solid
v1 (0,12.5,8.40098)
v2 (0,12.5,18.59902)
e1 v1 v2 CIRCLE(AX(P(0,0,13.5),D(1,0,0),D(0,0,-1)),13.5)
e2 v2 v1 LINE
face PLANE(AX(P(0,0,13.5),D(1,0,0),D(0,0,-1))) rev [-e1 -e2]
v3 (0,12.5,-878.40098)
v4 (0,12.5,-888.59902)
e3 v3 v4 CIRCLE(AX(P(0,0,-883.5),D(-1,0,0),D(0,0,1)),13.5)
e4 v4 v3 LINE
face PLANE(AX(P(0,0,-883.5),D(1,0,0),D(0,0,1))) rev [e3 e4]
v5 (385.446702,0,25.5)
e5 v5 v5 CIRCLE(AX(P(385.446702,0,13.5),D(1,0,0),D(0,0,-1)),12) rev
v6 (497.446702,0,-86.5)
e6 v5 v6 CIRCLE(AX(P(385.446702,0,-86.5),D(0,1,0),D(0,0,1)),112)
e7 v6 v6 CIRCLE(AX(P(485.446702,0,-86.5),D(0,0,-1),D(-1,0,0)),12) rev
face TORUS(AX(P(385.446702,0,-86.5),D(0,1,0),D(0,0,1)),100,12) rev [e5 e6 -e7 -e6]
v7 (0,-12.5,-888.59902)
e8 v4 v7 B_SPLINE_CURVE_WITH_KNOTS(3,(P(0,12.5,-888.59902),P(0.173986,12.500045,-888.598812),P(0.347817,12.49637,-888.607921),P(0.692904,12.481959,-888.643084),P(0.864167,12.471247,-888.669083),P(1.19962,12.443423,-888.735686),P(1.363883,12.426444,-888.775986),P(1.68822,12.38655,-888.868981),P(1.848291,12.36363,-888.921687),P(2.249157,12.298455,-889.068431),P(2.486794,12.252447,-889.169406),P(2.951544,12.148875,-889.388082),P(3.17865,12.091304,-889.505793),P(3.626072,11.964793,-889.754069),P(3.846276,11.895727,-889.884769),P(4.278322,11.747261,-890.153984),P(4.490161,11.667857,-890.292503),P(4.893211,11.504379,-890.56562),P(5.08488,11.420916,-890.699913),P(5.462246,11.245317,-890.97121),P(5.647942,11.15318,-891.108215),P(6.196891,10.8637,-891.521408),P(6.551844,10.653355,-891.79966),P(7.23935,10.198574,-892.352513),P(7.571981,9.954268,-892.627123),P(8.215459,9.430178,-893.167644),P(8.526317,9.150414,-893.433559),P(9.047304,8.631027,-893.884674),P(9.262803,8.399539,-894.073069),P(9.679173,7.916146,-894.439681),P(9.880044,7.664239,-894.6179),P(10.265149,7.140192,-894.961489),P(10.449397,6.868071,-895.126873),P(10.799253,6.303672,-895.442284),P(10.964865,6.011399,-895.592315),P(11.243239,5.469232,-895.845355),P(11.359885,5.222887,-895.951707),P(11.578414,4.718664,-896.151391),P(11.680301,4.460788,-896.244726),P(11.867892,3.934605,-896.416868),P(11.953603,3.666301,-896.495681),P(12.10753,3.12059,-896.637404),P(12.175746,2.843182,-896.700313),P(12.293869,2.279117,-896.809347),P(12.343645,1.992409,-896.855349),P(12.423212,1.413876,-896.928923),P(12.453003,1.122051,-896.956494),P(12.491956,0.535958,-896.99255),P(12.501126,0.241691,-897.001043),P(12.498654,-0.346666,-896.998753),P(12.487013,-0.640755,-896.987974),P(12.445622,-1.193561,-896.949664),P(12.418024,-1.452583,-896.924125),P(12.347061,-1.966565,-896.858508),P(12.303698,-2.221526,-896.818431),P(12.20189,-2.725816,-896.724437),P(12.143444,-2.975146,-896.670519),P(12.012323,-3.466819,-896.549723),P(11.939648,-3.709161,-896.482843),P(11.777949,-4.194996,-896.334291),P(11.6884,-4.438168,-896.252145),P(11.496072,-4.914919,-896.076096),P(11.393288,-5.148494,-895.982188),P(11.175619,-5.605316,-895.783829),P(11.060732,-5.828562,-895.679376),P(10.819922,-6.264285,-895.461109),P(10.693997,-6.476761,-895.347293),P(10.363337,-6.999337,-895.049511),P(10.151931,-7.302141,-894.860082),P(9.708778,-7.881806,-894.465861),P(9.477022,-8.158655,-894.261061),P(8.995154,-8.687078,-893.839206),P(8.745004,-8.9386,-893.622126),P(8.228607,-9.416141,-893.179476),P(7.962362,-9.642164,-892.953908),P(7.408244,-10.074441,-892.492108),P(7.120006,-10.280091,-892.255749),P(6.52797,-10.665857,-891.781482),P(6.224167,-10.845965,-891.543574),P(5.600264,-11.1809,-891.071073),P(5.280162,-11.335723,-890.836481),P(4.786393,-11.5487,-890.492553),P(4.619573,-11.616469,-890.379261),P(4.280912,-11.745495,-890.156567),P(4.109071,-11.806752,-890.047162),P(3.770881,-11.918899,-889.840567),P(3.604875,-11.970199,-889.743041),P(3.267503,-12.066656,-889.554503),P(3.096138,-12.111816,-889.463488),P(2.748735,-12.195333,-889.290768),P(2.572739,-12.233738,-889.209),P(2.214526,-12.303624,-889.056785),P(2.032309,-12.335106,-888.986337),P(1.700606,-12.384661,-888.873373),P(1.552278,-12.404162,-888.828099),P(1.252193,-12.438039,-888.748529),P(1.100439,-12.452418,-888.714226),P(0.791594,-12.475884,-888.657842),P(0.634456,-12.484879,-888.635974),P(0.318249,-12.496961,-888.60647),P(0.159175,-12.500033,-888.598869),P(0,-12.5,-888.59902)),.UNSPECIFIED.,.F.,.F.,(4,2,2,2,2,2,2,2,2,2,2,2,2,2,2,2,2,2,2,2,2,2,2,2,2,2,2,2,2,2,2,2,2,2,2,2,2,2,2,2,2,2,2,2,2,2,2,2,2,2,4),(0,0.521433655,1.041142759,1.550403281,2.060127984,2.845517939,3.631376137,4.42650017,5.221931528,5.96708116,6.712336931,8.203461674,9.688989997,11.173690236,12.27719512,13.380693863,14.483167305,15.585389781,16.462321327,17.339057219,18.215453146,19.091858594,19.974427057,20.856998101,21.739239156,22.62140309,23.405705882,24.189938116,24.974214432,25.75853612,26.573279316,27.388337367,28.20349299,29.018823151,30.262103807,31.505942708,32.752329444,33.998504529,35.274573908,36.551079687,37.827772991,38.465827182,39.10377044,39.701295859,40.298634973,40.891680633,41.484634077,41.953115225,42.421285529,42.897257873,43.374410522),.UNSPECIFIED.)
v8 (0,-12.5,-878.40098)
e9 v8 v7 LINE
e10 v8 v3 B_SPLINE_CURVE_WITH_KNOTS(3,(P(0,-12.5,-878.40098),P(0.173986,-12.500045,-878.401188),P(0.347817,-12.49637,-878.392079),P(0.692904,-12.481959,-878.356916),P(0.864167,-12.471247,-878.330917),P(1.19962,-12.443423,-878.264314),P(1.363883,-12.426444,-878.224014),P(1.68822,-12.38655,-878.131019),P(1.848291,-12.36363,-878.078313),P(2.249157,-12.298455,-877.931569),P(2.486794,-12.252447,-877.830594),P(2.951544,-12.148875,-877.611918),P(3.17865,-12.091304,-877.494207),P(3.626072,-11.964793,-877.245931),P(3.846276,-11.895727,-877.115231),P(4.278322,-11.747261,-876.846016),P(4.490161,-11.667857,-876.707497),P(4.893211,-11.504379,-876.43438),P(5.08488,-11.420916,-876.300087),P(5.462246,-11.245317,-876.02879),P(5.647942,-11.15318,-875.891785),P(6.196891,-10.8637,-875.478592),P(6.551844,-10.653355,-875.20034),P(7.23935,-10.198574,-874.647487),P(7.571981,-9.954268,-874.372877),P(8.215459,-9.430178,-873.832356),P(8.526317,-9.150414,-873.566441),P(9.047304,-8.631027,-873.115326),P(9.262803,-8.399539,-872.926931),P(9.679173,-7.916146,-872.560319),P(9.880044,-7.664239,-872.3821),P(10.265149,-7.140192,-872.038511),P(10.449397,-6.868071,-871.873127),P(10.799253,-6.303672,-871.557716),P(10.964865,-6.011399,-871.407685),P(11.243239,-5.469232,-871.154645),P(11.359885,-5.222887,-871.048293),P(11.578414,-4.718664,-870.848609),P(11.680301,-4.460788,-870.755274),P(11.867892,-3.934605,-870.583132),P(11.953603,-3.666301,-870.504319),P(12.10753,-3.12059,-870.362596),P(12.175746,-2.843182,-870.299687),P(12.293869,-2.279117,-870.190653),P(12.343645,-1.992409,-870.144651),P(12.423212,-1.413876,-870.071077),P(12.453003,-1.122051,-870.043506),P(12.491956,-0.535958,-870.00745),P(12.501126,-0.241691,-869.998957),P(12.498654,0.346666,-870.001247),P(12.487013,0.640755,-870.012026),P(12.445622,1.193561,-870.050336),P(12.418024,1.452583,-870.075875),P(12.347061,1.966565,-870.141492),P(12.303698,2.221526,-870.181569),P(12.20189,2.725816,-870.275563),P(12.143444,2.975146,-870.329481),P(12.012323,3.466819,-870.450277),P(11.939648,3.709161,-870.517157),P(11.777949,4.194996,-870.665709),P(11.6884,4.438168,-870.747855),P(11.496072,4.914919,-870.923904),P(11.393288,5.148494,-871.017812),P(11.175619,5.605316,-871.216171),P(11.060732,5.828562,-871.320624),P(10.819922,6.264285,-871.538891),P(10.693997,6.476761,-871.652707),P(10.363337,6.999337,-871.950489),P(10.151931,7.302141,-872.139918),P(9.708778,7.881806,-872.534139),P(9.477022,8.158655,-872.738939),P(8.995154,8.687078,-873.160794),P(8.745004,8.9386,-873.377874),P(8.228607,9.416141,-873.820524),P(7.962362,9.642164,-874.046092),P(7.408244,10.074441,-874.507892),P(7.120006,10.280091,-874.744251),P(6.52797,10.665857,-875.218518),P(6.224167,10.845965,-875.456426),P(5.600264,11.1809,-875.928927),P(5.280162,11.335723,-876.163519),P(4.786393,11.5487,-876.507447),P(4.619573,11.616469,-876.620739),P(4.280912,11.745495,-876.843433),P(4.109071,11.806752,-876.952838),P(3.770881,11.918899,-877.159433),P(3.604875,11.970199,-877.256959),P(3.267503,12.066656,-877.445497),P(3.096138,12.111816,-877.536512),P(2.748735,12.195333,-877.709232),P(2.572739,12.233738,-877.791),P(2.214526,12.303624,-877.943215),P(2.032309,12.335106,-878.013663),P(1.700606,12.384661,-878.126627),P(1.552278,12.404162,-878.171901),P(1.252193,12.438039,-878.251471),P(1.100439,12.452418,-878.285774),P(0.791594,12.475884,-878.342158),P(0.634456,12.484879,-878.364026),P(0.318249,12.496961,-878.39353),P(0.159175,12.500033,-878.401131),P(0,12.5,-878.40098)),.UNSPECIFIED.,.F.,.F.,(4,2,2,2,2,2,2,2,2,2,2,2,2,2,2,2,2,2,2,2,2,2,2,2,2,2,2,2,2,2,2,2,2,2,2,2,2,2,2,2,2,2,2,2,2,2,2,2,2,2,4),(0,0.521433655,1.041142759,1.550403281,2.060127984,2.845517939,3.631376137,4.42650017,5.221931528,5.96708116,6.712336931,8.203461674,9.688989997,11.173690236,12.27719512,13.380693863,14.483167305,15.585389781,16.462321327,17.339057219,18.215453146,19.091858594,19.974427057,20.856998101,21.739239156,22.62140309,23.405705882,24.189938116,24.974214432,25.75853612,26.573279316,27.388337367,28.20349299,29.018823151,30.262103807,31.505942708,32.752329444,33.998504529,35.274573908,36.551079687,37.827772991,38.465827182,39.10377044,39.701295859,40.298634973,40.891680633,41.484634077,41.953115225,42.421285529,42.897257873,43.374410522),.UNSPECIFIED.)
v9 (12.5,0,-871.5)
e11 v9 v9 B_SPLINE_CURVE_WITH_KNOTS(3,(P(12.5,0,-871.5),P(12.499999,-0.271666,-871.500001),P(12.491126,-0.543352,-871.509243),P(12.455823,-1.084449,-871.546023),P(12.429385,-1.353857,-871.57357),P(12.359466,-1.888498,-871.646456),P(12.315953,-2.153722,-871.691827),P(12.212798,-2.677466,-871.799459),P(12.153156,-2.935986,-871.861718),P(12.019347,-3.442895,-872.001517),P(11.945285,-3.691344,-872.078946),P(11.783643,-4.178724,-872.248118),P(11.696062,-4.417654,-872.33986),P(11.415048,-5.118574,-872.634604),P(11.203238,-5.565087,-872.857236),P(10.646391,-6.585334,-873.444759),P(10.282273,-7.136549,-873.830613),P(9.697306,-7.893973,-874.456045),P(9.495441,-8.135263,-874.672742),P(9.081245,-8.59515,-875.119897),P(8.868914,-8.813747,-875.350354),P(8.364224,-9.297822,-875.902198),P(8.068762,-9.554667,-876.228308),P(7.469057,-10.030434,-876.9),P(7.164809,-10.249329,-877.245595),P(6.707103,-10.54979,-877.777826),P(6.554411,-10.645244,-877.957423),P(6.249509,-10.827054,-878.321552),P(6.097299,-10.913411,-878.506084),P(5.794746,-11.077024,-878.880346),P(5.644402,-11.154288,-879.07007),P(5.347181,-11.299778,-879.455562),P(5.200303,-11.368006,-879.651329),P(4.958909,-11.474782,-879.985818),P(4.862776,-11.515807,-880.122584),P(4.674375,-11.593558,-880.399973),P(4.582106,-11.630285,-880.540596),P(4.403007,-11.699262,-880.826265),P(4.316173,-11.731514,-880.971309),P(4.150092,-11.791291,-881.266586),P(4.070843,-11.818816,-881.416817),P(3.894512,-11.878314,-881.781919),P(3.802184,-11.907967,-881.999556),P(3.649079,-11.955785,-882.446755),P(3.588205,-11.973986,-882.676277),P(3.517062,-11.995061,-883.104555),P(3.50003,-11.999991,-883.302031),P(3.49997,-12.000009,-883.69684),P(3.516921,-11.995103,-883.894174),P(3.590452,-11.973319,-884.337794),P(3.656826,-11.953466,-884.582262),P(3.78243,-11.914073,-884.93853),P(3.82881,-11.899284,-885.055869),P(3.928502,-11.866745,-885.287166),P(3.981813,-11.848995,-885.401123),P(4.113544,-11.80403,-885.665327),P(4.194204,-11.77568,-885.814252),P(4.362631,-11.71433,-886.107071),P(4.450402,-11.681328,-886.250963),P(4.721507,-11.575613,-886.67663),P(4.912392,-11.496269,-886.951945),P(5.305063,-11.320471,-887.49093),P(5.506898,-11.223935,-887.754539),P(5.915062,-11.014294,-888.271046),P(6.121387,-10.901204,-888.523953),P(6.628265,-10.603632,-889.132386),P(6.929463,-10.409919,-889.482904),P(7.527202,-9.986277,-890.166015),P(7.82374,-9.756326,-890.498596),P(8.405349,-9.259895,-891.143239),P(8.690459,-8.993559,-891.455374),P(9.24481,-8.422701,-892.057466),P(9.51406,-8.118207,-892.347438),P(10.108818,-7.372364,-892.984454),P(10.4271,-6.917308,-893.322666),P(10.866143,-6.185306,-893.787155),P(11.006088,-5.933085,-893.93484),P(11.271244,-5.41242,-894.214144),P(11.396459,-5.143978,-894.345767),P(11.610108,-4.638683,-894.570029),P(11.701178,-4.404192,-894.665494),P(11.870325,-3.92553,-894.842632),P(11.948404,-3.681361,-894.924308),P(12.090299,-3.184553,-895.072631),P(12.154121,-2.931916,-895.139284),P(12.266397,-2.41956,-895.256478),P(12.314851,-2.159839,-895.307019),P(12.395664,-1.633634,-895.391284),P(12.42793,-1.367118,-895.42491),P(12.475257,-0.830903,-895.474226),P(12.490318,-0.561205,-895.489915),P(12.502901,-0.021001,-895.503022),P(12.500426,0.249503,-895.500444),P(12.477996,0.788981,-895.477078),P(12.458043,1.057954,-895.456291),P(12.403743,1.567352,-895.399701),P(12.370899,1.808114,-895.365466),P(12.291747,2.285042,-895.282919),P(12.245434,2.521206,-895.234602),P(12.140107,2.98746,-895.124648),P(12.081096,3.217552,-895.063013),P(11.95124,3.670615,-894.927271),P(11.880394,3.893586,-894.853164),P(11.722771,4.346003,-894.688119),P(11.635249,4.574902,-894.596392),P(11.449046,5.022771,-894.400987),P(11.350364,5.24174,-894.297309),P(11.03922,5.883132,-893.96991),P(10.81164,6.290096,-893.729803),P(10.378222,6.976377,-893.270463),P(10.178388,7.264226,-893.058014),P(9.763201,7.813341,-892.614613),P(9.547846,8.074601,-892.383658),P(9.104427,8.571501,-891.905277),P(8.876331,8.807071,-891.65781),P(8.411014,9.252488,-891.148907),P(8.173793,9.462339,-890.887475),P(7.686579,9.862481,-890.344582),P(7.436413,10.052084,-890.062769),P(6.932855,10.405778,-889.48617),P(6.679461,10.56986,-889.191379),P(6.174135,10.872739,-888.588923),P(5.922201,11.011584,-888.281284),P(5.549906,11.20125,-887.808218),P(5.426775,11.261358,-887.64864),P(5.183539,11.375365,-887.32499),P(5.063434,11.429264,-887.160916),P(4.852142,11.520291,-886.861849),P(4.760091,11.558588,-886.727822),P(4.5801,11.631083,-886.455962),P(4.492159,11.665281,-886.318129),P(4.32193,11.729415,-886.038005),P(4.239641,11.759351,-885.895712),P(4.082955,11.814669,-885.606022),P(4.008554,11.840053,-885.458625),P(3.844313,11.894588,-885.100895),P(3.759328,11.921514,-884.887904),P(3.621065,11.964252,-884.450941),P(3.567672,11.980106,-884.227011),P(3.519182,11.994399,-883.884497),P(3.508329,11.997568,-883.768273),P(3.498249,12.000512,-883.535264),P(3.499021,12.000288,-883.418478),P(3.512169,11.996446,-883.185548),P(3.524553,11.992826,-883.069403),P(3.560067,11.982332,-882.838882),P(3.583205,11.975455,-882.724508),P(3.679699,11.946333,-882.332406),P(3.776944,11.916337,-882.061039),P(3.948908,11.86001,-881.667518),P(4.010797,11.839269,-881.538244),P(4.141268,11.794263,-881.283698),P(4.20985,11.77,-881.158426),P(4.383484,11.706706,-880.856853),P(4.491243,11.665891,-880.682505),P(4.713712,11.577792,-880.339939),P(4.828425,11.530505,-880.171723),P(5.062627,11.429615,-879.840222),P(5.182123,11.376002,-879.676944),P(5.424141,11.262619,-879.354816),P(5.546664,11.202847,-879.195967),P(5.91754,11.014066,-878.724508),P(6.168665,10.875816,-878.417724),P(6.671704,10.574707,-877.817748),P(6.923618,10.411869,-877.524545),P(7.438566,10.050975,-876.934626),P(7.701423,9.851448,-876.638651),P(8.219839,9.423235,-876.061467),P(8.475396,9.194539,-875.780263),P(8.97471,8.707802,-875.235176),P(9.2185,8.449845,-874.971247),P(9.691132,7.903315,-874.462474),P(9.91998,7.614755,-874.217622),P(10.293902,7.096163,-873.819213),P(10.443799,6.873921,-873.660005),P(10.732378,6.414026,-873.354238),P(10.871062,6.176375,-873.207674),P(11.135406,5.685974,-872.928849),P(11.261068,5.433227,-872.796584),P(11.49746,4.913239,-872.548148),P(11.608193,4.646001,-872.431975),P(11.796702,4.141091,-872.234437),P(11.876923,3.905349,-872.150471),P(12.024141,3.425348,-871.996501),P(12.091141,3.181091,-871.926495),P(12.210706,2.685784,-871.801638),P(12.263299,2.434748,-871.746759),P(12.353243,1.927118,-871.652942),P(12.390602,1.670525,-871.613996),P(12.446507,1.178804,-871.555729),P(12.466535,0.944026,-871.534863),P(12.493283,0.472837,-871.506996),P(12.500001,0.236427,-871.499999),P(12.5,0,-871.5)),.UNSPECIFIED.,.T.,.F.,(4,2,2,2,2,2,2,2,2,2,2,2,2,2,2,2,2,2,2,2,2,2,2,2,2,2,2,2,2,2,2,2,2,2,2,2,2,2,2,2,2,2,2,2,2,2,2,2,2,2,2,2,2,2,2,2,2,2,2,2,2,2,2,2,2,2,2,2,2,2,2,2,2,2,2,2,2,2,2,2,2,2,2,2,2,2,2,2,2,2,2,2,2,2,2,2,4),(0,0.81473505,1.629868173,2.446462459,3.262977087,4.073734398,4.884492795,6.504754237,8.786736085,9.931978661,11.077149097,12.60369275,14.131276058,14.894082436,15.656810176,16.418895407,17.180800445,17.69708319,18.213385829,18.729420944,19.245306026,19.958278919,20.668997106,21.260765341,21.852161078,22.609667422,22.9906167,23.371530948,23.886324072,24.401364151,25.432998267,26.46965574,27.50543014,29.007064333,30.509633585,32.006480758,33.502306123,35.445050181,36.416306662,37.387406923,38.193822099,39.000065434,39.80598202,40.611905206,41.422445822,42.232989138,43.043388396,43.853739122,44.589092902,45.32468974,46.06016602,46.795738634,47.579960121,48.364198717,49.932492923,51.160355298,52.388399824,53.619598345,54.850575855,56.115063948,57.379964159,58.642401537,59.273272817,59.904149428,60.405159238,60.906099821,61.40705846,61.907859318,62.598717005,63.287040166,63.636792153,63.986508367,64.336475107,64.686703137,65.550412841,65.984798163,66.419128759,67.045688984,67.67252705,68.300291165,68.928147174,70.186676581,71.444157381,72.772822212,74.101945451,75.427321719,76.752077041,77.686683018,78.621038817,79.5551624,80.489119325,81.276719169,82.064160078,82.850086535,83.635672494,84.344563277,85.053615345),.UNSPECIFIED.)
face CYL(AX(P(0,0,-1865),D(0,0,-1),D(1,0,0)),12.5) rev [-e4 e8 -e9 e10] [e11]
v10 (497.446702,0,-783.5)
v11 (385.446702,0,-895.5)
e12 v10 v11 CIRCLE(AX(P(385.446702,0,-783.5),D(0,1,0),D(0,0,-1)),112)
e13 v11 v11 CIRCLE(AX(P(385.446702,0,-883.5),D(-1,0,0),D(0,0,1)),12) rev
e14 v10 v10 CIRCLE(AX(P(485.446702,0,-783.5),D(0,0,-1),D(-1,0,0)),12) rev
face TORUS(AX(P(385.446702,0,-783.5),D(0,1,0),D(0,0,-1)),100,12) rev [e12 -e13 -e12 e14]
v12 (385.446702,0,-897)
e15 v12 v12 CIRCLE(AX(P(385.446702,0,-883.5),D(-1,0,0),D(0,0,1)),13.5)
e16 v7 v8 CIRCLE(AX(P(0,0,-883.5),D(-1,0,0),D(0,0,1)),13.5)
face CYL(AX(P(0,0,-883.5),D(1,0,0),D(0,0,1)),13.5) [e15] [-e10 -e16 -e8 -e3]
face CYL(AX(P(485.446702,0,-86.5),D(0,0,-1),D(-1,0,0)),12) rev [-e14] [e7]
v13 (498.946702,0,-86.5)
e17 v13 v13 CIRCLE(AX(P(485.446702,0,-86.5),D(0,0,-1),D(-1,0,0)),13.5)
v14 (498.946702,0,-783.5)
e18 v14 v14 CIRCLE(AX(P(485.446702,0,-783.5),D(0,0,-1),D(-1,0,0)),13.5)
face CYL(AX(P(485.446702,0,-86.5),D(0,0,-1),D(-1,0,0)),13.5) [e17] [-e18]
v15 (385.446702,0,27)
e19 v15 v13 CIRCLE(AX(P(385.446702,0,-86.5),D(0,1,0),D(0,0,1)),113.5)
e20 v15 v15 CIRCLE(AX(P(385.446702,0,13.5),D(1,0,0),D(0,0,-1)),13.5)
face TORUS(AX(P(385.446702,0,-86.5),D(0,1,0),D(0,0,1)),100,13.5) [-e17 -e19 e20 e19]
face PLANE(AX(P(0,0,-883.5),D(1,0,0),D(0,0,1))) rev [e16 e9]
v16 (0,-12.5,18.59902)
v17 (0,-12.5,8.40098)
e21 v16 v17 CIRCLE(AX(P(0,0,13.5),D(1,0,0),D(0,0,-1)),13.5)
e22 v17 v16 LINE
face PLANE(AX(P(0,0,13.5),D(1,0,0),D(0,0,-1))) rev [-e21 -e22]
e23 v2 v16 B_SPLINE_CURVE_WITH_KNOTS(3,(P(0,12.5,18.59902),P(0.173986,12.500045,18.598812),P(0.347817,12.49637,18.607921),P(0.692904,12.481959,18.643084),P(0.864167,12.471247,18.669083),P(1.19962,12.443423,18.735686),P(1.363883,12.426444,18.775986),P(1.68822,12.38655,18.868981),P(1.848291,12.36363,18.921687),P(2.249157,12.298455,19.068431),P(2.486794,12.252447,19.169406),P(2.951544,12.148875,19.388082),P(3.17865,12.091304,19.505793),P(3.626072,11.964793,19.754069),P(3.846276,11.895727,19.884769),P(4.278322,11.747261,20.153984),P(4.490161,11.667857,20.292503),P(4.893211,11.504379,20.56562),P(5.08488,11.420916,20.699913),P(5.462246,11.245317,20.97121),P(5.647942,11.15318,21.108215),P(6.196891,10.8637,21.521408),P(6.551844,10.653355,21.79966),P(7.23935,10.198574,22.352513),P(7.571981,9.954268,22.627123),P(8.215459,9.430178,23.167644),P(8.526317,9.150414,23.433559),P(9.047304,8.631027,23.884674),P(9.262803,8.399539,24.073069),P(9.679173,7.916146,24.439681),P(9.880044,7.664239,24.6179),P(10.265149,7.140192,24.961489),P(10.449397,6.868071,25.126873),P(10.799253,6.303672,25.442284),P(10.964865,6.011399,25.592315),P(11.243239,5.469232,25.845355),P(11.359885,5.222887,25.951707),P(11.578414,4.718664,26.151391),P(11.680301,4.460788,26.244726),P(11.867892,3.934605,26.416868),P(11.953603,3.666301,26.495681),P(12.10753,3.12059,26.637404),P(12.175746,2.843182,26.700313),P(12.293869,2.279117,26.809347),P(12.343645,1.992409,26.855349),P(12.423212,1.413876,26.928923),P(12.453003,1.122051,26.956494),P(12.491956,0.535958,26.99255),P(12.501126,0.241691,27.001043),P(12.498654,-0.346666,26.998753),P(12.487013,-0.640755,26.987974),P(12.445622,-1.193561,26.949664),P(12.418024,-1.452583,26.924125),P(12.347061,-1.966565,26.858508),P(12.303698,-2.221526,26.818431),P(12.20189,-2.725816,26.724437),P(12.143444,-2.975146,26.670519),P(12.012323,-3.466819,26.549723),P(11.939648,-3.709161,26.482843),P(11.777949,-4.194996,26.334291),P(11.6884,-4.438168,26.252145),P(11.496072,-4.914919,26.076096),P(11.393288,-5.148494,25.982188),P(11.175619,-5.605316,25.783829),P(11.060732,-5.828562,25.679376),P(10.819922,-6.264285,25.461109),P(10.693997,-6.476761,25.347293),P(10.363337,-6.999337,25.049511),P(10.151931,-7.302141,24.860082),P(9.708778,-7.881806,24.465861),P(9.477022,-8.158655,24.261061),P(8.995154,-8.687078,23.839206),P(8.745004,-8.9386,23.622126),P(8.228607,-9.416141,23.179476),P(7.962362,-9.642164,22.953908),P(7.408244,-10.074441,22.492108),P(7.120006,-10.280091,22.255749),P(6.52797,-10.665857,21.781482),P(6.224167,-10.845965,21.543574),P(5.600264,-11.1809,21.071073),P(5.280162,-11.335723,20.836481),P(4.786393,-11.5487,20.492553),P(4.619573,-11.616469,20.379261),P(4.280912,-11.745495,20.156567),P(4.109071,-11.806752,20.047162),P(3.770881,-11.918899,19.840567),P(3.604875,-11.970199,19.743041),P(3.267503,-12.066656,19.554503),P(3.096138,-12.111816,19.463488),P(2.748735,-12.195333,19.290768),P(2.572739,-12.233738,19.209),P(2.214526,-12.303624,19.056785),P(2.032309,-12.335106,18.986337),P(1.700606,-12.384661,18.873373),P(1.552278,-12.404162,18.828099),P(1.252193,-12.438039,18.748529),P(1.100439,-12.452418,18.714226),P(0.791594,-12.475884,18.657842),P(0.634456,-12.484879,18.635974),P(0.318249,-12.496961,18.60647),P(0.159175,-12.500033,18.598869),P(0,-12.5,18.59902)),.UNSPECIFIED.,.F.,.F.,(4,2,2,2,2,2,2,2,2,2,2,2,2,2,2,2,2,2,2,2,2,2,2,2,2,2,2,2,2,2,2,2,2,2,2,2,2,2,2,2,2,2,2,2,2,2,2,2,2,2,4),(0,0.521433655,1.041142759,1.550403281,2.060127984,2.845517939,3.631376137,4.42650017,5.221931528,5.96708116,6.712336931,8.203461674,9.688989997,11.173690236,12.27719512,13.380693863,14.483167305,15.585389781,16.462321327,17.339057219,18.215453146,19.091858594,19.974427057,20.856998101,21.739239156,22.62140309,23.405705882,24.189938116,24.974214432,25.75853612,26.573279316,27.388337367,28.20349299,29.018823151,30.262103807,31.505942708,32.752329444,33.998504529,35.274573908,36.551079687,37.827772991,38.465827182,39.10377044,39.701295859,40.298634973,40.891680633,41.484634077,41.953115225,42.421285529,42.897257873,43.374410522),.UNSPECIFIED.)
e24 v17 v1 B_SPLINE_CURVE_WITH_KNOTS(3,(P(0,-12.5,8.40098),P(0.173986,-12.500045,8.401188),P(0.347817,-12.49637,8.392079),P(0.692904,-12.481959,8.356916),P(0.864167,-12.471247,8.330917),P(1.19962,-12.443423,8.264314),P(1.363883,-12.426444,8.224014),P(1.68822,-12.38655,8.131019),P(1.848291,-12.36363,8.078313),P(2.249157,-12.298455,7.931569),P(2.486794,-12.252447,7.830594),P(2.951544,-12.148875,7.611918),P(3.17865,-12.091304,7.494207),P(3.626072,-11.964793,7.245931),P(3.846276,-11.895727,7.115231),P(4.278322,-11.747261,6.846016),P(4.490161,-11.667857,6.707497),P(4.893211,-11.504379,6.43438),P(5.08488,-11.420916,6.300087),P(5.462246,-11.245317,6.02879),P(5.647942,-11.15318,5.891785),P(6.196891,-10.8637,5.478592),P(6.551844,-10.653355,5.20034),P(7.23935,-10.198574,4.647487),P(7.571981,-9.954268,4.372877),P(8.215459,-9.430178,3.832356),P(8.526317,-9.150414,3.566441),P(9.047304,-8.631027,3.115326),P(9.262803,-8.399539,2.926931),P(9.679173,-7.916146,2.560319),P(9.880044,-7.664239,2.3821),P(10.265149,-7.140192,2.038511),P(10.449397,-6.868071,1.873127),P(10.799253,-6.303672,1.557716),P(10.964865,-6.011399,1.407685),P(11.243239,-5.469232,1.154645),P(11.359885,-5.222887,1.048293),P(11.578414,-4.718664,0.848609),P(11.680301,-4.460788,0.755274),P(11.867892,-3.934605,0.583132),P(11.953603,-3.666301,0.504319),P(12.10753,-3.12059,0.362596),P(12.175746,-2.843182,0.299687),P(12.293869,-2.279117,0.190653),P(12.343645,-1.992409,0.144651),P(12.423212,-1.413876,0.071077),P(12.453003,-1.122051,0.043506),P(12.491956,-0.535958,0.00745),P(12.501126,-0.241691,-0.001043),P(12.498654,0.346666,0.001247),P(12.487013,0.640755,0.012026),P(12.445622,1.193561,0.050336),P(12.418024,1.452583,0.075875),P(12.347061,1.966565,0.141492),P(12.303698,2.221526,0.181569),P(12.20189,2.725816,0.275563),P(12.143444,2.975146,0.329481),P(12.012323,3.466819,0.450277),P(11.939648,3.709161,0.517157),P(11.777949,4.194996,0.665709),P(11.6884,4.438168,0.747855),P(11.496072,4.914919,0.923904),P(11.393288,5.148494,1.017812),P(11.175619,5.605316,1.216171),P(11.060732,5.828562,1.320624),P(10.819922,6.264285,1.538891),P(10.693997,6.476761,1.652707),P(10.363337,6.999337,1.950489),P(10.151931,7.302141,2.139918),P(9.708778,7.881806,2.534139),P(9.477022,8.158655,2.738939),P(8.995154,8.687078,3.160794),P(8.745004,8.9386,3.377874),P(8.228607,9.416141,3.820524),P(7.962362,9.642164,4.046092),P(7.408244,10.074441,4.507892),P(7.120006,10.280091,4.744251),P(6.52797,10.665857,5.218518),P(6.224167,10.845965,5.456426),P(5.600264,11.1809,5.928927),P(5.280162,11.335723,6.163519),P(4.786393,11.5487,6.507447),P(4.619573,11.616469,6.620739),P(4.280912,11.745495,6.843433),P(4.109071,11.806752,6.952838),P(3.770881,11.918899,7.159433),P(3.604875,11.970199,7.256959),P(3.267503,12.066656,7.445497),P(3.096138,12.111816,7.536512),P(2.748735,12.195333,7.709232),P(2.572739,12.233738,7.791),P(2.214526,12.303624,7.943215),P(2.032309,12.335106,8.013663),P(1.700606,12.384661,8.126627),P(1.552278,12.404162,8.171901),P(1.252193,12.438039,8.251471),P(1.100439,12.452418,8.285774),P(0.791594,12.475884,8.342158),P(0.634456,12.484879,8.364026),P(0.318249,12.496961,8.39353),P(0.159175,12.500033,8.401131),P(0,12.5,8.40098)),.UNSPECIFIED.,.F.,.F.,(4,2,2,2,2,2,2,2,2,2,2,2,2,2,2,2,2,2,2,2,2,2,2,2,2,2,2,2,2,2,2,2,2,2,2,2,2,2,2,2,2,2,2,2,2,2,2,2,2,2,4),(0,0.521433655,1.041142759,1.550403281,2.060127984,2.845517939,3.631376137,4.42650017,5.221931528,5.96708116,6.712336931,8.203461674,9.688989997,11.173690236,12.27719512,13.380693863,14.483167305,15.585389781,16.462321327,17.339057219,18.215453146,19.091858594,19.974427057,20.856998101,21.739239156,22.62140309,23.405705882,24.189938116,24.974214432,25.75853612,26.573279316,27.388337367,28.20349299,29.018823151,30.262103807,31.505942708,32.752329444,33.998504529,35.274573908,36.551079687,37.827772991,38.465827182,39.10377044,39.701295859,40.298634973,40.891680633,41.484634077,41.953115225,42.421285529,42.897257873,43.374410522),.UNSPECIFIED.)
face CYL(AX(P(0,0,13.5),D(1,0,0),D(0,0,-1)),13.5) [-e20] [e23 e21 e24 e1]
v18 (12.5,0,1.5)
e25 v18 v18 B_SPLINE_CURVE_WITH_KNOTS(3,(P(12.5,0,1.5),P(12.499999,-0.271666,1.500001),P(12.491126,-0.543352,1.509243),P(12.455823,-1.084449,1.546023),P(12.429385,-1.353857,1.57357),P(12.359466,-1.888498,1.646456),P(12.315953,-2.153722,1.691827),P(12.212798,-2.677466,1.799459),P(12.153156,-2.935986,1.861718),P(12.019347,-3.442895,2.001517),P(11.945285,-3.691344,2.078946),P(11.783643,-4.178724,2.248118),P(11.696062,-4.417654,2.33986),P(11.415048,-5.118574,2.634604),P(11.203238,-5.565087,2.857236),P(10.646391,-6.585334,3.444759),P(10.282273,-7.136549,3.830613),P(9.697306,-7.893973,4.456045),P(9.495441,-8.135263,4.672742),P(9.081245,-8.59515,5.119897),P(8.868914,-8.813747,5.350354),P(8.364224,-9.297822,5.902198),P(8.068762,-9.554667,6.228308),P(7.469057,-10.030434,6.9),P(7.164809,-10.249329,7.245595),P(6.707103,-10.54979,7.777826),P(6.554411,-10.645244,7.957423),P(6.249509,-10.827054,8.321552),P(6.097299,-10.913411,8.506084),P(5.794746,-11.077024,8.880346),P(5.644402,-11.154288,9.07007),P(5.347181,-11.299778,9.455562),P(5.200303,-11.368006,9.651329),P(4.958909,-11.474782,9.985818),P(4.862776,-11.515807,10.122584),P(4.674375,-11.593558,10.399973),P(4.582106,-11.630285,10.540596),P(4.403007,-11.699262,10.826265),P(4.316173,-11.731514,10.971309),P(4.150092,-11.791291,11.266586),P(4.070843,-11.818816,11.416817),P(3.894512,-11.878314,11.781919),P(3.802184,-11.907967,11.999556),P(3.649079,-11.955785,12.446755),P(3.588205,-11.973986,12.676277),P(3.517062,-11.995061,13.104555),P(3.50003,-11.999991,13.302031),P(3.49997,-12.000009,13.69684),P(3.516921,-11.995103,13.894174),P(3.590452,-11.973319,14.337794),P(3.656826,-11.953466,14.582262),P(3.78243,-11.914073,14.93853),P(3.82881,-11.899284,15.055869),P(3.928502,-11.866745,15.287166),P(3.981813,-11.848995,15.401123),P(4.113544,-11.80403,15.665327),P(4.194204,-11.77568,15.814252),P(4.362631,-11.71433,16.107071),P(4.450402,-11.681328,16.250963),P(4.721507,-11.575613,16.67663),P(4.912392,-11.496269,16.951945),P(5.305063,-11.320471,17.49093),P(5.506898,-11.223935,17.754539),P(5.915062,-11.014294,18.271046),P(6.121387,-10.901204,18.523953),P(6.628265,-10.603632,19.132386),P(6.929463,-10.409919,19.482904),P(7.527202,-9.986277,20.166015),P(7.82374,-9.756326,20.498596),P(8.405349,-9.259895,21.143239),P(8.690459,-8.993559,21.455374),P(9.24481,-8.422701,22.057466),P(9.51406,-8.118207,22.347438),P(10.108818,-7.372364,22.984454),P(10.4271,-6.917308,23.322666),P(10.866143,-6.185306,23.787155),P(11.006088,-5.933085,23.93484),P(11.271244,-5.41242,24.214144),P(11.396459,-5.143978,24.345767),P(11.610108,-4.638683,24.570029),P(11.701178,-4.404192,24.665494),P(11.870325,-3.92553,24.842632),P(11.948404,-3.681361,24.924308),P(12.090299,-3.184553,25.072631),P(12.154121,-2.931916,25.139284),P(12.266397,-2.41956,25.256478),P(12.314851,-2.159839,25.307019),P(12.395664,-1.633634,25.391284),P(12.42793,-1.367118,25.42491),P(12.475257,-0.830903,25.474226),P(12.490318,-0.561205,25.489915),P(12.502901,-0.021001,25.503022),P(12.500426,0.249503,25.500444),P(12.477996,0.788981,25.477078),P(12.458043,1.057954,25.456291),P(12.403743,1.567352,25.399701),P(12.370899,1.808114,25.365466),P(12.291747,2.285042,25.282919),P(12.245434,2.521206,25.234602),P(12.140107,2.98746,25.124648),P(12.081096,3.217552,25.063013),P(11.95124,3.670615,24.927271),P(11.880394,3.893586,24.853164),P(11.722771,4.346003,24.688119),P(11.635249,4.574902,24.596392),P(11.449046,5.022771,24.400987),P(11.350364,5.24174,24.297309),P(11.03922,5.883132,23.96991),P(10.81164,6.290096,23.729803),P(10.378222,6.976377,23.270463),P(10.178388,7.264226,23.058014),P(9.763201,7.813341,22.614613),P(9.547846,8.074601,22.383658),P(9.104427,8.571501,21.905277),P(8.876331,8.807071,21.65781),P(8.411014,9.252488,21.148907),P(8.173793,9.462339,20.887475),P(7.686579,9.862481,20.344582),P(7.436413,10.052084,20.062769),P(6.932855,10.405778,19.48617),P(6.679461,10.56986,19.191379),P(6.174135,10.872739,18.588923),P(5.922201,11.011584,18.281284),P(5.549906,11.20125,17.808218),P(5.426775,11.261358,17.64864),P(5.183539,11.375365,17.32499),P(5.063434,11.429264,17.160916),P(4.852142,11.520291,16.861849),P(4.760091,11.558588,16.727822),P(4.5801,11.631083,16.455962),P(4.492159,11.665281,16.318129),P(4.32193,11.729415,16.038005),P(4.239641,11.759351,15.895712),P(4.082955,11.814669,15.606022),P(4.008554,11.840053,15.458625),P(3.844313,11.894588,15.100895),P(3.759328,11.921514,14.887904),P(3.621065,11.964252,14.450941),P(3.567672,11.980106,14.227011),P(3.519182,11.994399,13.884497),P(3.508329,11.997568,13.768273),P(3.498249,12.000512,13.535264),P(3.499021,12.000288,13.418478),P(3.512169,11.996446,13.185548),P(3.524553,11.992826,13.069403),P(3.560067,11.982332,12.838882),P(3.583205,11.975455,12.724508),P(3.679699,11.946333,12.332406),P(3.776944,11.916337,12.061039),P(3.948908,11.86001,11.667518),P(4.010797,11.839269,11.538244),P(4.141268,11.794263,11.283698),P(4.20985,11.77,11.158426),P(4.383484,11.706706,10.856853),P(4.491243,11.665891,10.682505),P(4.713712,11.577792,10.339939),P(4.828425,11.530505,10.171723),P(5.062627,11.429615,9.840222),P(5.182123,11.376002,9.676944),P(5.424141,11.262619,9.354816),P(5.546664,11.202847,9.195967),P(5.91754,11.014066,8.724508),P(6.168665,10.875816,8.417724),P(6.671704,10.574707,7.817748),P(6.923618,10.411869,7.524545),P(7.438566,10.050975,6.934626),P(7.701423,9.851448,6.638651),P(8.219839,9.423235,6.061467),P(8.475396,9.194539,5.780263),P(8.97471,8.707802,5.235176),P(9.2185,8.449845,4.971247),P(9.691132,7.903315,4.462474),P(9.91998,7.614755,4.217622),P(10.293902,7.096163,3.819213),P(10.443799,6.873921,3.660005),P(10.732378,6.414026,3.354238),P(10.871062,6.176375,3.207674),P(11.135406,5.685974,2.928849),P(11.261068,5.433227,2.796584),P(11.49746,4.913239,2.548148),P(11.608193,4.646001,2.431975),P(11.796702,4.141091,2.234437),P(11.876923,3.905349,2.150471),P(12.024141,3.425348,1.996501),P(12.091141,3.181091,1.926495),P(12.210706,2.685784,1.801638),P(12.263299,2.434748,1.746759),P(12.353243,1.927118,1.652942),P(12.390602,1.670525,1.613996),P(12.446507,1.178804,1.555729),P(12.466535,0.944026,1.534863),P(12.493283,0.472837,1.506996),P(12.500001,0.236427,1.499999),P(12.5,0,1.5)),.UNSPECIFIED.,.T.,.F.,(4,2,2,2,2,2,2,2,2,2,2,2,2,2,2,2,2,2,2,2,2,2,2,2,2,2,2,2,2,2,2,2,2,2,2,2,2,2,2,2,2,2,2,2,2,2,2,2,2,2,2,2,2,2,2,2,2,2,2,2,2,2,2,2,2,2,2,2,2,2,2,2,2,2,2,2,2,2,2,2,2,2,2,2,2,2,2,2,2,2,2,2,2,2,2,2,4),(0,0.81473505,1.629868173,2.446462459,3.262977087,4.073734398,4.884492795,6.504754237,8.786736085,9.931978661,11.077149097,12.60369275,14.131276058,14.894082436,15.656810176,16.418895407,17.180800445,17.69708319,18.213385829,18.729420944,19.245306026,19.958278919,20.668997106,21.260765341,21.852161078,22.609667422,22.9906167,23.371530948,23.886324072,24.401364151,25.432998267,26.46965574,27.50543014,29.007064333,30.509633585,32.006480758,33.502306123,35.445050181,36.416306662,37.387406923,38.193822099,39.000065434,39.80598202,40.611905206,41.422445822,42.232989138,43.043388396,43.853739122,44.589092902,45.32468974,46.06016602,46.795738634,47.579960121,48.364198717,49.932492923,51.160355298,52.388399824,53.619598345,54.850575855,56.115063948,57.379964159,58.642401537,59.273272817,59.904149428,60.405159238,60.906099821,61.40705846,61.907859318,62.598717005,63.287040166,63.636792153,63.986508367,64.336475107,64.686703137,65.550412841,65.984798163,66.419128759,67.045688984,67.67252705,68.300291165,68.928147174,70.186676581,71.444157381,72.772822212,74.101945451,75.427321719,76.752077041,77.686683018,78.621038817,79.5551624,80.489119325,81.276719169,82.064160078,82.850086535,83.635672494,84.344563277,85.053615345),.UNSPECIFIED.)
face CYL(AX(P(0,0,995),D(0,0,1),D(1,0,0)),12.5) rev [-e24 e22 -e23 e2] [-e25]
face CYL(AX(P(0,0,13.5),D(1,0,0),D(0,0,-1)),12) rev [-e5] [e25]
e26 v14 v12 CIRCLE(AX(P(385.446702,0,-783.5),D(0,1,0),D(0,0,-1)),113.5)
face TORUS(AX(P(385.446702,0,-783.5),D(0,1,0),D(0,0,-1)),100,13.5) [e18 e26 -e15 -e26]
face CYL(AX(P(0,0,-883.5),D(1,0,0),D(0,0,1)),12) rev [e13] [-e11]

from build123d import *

# Parameters (mm, degrees)
SKETCH_1_R    = 13.5
SKETCH_1_R_2  = 12
OTHER_START   = -9e-09
OTHER_1_DEPTH = 27.000000009


# Read off the part's stored shape, not the designer's step: Полость1
with BuildPart() as part:
    # По траектории1: sweep along a path in Эскиз2
    with BuildLine(Plane(origin=(0, 0, 0), x_dir=(1, 0, 0), z_dir=(0, 1, 0))) as sweep_1_path:
        Line((0, -13.5), (385.446701658, -13.5))
        ThreePointArc((385.446701658, -13.5), (456.157379776, 15.789321881), (485.446701658, 86.5))
        Line((485.446701658, 86.5), (485.446701658, 435))
    # Эскиз1 → По траектории1 (sweep)
    with BuildSketch(Plane(origin=(0, 0, 0), x_dir=(0, 0, -1), z_dir=(1, 0, 0))):
        with Locations((-13.5, 0)):
            Circle(SKETCH_1_R)
        with Locations((-13.5, 0)):
            Circle(SKETCH_1_R_2, mode=Mode.SUBTRACT)
    sweep(path=sweep_1_path.line)

    # Полость1 outline → Полость1 (cut)
    with BuildSketch(Plane.XY.offset(OTHER_START)):
        with BuildLine():
            Line((0, 12.5), (0, -12.5))
            ThreePointArc((0, -12.5), (12.5, 0), (0, 12.5))
        make_face()
    extrude(amount=OTHER_1_DEPTH, mode=Mode.SUBTRACT)

    # Зеркальное отражение1: part across plane


with BuildPart() as part_1:
    add(part.part)
    add(part.part.mirror(Plane(origin=(485.446701658, 0, -435), x_dir=(1, 0, 0), z_dir=(0, 0, -1))))


solid = part_1.part
